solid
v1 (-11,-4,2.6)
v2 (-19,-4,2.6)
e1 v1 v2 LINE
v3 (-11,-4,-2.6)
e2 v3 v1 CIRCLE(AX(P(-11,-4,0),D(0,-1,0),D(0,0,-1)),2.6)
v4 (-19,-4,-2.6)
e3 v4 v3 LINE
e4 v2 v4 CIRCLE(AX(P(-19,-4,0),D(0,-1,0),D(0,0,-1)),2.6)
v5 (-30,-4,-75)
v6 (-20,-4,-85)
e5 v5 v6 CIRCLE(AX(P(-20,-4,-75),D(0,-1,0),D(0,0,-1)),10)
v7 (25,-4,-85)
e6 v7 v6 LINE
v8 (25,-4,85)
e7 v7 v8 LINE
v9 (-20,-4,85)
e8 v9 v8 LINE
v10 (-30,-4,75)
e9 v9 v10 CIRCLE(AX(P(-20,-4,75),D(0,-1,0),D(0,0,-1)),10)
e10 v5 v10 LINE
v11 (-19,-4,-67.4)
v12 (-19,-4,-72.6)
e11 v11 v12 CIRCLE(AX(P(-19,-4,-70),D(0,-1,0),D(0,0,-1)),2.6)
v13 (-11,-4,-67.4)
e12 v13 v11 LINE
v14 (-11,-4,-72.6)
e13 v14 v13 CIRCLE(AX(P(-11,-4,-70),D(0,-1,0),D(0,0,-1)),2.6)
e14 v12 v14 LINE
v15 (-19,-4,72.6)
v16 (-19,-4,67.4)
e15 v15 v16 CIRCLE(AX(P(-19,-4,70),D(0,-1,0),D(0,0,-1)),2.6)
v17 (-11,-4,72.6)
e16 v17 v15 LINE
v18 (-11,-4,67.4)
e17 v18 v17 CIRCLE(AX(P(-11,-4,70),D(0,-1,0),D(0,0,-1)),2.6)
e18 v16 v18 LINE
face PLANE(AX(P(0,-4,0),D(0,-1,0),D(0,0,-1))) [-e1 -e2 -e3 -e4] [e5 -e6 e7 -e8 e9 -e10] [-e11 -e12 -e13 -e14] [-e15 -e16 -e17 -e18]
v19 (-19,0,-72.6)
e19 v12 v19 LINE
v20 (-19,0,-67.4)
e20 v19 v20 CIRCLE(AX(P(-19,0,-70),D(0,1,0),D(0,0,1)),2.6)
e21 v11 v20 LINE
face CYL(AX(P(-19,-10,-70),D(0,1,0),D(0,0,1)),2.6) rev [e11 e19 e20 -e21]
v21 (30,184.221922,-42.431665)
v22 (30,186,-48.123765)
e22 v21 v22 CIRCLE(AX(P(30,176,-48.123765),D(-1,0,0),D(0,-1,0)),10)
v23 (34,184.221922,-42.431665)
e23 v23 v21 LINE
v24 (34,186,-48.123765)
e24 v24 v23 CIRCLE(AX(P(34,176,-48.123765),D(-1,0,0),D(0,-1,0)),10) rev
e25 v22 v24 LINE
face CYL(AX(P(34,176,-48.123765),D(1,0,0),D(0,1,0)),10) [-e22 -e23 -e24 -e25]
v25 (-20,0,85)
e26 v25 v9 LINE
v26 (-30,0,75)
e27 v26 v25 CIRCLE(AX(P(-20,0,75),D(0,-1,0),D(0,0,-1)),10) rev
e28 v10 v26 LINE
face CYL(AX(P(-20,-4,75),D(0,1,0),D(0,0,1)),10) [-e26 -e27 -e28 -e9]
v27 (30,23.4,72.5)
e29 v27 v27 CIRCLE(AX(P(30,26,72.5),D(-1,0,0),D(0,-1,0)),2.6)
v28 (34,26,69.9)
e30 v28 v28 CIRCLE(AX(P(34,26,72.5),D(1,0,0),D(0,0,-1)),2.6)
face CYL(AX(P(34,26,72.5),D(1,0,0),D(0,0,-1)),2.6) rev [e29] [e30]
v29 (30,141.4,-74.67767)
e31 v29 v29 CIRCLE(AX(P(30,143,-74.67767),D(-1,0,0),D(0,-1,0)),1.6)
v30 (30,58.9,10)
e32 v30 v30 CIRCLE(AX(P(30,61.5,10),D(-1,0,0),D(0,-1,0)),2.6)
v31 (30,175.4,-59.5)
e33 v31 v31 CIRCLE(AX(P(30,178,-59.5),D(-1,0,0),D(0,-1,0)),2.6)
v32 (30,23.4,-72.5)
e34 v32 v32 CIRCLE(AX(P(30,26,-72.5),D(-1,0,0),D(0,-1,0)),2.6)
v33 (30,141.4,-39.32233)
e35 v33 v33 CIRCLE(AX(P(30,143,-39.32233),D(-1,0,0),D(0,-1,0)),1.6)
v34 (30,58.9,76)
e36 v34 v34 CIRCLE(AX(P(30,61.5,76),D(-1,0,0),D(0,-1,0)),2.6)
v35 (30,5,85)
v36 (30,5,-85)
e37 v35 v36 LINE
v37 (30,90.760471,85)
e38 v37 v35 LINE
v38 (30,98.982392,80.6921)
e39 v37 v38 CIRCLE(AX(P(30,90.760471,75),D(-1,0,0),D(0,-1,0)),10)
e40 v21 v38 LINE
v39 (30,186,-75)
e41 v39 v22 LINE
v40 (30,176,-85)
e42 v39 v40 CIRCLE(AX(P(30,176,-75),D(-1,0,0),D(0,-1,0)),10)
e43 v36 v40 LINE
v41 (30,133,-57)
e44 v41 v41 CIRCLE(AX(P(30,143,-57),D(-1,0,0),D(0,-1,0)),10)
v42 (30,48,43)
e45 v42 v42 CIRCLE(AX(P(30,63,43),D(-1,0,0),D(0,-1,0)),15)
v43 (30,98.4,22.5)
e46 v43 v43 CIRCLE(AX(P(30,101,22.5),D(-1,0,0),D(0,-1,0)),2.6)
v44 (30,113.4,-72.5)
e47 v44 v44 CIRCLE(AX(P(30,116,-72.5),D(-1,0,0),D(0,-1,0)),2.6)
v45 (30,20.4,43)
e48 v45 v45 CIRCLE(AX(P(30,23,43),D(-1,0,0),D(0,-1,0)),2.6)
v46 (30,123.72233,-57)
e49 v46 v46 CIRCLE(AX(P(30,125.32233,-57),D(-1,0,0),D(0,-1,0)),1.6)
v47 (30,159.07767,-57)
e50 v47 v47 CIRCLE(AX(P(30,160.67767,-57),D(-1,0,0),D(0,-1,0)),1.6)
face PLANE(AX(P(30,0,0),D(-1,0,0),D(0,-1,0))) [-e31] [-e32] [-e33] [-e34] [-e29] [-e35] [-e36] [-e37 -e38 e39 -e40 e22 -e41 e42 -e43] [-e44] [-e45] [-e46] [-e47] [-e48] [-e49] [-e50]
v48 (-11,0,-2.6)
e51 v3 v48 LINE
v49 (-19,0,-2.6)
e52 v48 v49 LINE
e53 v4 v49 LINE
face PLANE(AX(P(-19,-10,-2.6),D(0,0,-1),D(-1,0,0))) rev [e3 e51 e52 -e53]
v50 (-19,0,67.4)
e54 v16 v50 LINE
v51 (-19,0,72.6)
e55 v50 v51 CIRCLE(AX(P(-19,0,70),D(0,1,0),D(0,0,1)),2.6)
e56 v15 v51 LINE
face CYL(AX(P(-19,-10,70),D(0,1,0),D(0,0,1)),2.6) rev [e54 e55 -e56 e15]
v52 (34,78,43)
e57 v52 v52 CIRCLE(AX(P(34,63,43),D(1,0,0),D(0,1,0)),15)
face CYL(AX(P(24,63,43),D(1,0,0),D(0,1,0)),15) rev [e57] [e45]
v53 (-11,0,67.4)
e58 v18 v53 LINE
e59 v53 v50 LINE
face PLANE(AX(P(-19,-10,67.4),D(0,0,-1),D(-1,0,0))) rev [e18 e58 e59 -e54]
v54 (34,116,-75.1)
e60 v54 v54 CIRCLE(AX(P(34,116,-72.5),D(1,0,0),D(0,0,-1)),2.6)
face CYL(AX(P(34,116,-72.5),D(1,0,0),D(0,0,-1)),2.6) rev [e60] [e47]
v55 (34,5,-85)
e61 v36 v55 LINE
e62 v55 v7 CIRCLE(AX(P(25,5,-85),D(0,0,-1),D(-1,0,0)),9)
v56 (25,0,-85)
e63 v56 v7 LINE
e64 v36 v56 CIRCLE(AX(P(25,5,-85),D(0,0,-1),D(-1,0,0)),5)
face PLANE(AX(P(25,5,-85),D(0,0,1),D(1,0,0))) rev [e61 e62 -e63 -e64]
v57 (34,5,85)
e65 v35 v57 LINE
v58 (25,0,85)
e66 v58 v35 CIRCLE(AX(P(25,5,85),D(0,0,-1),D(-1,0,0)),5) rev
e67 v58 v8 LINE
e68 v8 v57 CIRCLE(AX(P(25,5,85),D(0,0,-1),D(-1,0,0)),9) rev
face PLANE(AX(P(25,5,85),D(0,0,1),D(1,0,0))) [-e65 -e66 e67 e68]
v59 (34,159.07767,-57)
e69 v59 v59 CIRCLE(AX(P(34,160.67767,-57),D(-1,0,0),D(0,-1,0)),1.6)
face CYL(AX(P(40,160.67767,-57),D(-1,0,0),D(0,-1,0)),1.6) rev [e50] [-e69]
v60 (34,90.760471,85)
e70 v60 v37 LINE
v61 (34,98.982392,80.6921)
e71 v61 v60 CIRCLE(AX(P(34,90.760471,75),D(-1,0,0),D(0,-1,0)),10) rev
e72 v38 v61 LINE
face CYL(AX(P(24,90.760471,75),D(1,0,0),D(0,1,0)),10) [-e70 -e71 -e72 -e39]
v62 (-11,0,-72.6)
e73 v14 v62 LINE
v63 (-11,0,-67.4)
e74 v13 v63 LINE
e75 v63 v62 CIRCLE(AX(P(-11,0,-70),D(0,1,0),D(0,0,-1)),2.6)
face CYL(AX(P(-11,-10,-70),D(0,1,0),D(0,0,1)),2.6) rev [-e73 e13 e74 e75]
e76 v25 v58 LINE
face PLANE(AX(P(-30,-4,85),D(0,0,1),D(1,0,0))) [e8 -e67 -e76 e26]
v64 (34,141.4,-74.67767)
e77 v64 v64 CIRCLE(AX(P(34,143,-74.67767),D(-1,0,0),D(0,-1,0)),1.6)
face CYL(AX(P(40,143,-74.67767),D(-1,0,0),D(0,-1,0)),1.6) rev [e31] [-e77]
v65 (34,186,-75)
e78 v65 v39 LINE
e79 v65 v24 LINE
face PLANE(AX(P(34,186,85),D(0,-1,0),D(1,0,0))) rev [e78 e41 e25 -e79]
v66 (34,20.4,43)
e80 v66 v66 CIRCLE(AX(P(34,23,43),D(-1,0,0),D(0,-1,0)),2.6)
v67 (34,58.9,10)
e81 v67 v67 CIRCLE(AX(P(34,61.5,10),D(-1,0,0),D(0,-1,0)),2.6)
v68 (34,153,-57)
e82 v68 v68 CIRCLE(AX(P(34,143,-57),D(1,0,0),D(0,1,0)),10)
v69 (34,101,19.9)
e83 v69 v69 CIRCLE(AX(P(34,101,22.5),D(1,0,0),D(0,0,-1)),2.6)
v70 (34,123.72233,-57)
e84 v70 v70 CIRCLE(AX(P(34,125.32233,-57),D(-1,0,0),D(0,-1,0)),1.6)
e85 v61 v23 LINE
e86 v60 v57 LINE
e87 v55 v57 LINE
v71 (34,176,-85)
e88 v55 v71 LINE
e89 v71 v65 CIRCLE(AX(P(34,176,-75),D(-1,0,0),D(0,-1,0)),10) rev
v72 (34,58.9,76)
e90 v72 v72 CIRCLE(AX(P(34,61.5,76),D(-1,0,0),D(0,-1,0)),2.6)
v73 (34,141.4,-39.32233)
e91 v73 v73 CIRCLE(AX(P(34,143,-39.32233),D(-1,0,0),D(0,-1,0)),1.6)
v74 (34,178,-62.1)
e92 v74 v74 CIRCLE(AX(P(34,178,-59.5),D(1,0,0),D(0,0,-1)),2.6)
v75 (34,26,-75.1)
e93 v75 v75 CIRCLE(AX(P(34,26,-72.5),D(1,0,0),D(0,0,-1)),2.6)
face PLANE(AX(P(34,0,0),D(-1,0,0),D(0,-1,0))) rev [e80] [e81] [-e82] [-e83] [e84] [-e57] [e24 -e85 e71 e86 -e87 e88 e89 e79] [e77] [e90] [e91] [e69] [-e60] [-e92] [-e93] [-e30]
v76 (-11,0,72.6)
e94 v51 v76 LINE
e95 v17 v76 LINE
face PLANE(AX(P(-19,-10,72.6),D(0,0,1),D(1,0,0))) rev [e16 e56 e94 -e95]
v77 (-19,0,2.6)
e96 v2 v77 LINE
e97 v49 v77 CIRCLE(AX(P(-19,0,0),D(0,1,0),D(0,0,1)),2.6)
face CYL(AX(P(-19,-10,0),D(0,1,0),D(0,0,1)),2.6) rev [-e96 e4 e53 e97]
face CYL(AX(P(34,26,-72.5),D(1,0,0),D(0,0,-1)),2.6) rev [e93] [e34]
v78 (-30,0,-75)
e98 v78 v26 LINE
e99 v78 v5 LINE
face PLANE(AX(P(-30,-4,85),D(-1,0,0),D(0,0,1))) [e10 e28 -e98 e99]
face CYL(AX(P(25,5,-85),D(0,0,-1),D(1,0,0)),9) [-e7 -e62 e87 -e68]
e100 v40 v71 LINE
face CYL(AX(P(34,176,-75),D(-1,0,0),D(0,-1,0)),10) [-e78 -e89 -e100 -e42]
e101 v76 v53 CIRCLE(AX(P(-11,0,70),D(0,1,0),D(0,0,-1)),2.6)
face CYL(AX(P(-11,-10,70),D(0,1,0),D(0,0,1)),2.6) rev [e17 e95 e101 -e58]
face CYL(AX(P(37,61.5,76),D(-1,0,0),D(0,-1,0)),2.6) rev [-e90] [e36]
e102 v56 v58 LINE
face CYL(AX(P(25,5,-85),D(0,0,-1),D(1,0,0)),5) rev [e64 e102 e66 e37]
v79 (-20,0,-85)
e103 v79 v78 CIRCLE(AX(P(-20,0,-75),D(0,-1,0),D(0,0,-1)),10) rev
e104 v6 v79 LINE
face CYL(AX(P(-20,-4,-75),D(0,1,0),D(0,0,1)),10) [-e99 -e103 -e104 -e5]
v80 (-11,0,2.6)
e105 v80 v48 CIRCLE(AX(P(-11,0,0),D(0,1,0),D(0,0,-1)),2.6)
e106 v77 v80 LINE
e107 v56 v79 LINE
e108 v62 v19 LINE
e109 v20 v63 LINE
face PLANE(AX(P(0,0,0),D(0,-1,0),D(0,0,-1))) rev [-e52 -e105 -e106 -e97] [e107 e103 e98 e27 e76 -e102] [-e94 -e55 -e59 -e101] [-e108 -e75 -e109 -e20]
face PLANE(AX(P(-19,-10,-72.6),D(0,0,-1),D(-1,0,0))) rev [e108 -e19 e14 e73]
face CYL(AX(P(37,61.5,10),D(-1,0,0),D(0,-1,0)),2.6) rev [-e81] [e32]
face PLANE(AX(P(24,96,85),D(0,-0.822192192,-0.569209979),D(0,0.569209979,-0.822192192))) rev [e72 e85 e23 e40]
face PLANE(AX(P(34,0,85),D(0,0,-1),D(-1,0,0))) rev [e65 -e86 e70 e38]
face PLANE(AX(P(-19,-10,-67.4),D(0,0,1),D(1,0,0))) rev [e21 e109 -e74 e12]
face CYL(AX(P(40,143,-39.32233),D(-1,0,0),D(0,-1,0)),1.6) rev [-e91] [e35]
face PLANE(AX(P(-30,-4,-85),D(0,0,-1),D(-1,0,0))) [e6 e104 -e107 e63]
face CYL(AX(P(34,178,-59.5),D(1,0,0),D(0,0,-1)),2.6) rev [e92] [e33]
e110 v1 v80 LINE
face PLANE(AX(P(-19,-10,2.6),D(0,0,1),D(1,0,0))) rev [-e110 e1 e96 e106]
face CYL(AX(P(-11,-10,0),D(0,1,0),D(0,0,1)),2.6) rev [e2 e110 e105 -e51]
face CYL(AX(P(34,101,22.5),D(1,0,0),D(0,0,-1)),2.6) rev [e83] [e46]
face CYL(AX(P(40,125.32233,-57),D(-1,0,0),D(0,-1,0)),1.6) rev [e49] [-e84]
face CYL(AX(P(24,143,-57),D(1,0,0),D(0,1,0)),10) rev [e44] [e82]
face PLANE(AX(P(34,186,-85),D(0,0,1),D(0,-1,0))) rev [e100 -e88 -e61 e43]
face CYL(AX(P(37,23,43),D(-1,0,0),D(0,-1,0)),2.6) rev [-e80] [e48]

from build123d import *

# Parameters (mm, degrees)
SKETCH1_W                    = 60
SKETCH1_H                    = 170
BASE_FLANGE1_DEPTH           = 4
EDGE_FLANGE1_STRIP_W         = 26
EDGE_FLANGE1_STRIP_H         = 4
EDGE_FLANGE1_STRIP_CUT_DEPTH = 170
EDGE_FLANGE1_DEPTH           = 170
SKETCH15_R                   = 15
SKETCH15_R_2                 = 10
CUT_EXTRUDE4_DEPTH           = 10
CUT_EXTRUDE5_DEPTH           = 10
SKETCH31_R                   = 2.6
CUT_EXTRUDE9_DEPTH           = 7
FILLET1_R                    = 10
SKETCH32_R                   = 1.6
CUT_EXTRUDE10_DEPTH          = 10
F_1_0MM_DOWEL_HOLE2_D        = 5.2
F_1_0MM_DOWEL_HOLE2_DEPTH    = 12.03
F_1_0MM_DOWEL_HOLE2_TIP      = 1.562237609
F_1_0MM_DOWEL_HOLE3_D        = 5.2
F_1_0MM_DOWEL_HOLE3_DEPTH    = 12.03
F_1_0MM_DOWEL_HOLE3_TIP      = 1.562237609
CUT_EXTRUDE11_DEPTH          = 10


# Sheet-metal steps are written as plain solids
with BuildPart() as part:
    # Sketch1 → Base-Flange1 (new body)
    with BuildSketch(Plane(origin=(0, 0, 0), x_dir=(1, 0, 0), z_dir=(0, 1, 0))):
        Rectangle(SKETCH1_W, SKETCH1_H)
    extrude(amount=-BASE_FLANGE1_DEPTH)

    # Edge-Flange1 strip (across the edge) → Edge-Flange1 strip cut (cut)
    with BuildSketch(Plane(origin=(30, 0, 85), x_dir=(-1, 0, 0), z_dir=(0, 0, -1))):
        with Locations((-8, -2)):
            Rectangle(EDGE_FLANGE1_STRIP_W, EDGE_FLANGE1_STRIP_H)
    extrude(amount=EDGE_FLANGE1_STRIP_CUT_DEPTH, mode=Mode.SUBTRACT)

    # Edge-Flange1 section (across the edge) → Edge-Flange1 (add)
    with BuildSketch(Plane(origin=(30, 0, 85), x_dir=(-1, 0, 0), z_dir=(0, 0, -1))):
        with BuildLine():
            Line((-4, 5), (-4, 186))
            Line((-4, 186), (0, 186))
            Line((0, 186), (0, 5))
            ThreePointArc((0, 5), (1.464466094, 1.464466094), (5, 0))
            Line((5, 0), (5, -4))
            ThreePointArc((5, -4), (-1.363961031, -1.363961031), (-4, 5))
        make_face()
    extrude(amount=EDGE_FLANGE1_DEPTH)

    # Sketch15 → Cut-Extrude4 (cut)
    with BuildSketch(Plane(origin=(34, 0, 0), x_dir=(0, 0, -1), z_dir=(1, 0, 0))):
        with Locations(Location((-43, 63, 0), (0, 0, 90))):
            Circle(SKETCH15_R)
        with Locations(Location((57, 143, 0), (0, 0, 90))):
            Circle(SKETCH15_R_2)
    extrude(amount=-CUT_EXTRUDE4_DEPTH, mode=Mode.SUBTRACT)

    # Sketch16 → Cut-Extrude5 (cut)
    with BuildSketch(Plane(origin=(34, 0, 0), x_dir=(0, 0, -1), z_dir=(1, 0, 0))):
        Polygon((-85, 186), (-85, 96), (45, 186), align=None)
    extrude(amount=-CUT_EXTRUDE5_DEPTH, mode=Mode.SUBTRACT)

    # Sketch31 → Cut-Extrude9 (cut)
    with BuildSketch(Plane.ZY.offset(-30)):
        with Locations(Location((76, 61.5, 0), (0, 0, 270))):
            Circle(SKETCH31_R)
        with Locations(Location((10, 61.5, 0), (0, 0, 270))):
            Circle(SKETCH31_R)
        with Locations(Location((43, 23, 0), (0, 0, 270))):
            Circle(SKETCH31_R)
    extrude(amount=-CUT_EXTRUDE9_DEPTH, mode=Mode.SUBTRACT)

    # Fillet1
    fillet1_edges = [part.edges().sort_by_distance(p)[0] for p in [
        (32, 186, -85),
        (32, 186, -45),
        (32, 96, 85),
        (-30, -2, 85),
        (-30, -2, -85),
    ]]
    fillet(fillet1_edges, radius=FILLET1_R)

    # Sketch32 → Cut-Extrude10 (cut)
    with BuildSketch(Plane.ZY.offset(-30)):
        with Locations(Location((-74.67766953, 143, 0), (0, 0, 270))):
            Circle(SKETCH32_R)
        with Locations(Location((-57, 125.32233047, 0), (0, 0, 270))):
            Circle(SKETCH32_R)
        with Locations(Location((-39.32233047, 143, 0), (0, 0, 270))):
            Circle(SKETCH32_R)
        with Locations(Location((-57, 160.67766953, 0), (0, 0, 270))):
            Circle(SKETCH32_R)
    extrude(amount=-CUT_EXTRUDE10_DEPTH, mode=Mode.SUBTRACT)

    # Ø1.0mm Dowel Hole2
    with Locations(Plane(origin=(34, 0, 0), x_dir=(0, 0, -1), z_dir=(1, 0, 0))):
        with Locations((-72.5, 26), (72.5, 26), (72.5, 116), (-22.5, 101), (59.5, 178)):
            Hole(F_1_0MM_DOWEL_HOLE2_D / 2, depth=F_1_0MM_DOWEL_HOLE2_DEPTH)
            with Locations((0, 0, -(F_1_0MM_DOWEL_HOLE2_DEPTH + F_1_0MM_DOWEL_HOLE2_TIP / 2))):  # 118° drill point
                Cone(0, F_1_0MM_DOWEL_HOLE2_D / 2, F_1_0MM_DOWEL_HOLE2_TIP, mode=Mode.SUBTRACT)

    # Ø1.0mm Dowel Hole3
    with Locations(Plane(origin=(0, 0, 0), x_dir=(1, 0, 0), z_dir=(0, 1, 0))):
        with Locations((-15, 70), (-15, 0), (-15, -70)):
            Hole(F_1_0MM_DOWEL_HOLE3_D / 2, depth=F_1_0MM_DOWEL_HOLE3_DEPTH)
            with Locations((0, 0, -(F_1_0MM_DOWEL_HOLE3_DEPTH + F_1_0MM_DOWEL_HOLE3_TIP / 2))):  # 118° drill point
                Cone(0, F_1_0MM_DOWEL_HOLE3_D / 2, F_1_0MM_DOWEL_HOLE3_TIP, mode=Mode.SUBTRACT)

    # Sketch40 → Cut-Extrude11 (cut)
    with BuildSketch(Plane(origin=(0, 0, 0), x_dir=(1, 0, 0), z_dir=(0, 1, 0))):
        with BuildLine():
            Line((-19, -72.6), (-11, -72.6))
            ThreePointArc((-11, -72.6), (-8.4, -70), (-11, -67.4))
            Line((-11, -67.4), (-19, -67.4))
            ThreePointArc((-19, -67.4), (-21.6, -70), (-19, -72.6))
        make_face()
        with BuildLine():
            Line((-19, -2.6), (-11, -2.6))
            ThreePointArc((-11, -2.6), (-8.4, 0), (-11, 2.6))
            Line((-11, 2.6), (-19, 2.6))
            ThreePointArc((-19, 2.6), (-21.6, 0), (-19, -2.6))
        make_face()
        with BuildLine():
            Line((-19, 67.4), (-11, 67.4))
            ThreePointArc((-11, 67.4), (-8.4, 70), (-11, 72.6))
            Line((-11, 72.6), (-19, 72.6))
            ThreePointArc((-19, 72.6), (-21.6, 70), (-19, 67.4))
        make_face()
    extrude(amount=-CUT_EXTRUDE11_DEPTH, mode=Mode.SUBTRACT)


solid = part.part
